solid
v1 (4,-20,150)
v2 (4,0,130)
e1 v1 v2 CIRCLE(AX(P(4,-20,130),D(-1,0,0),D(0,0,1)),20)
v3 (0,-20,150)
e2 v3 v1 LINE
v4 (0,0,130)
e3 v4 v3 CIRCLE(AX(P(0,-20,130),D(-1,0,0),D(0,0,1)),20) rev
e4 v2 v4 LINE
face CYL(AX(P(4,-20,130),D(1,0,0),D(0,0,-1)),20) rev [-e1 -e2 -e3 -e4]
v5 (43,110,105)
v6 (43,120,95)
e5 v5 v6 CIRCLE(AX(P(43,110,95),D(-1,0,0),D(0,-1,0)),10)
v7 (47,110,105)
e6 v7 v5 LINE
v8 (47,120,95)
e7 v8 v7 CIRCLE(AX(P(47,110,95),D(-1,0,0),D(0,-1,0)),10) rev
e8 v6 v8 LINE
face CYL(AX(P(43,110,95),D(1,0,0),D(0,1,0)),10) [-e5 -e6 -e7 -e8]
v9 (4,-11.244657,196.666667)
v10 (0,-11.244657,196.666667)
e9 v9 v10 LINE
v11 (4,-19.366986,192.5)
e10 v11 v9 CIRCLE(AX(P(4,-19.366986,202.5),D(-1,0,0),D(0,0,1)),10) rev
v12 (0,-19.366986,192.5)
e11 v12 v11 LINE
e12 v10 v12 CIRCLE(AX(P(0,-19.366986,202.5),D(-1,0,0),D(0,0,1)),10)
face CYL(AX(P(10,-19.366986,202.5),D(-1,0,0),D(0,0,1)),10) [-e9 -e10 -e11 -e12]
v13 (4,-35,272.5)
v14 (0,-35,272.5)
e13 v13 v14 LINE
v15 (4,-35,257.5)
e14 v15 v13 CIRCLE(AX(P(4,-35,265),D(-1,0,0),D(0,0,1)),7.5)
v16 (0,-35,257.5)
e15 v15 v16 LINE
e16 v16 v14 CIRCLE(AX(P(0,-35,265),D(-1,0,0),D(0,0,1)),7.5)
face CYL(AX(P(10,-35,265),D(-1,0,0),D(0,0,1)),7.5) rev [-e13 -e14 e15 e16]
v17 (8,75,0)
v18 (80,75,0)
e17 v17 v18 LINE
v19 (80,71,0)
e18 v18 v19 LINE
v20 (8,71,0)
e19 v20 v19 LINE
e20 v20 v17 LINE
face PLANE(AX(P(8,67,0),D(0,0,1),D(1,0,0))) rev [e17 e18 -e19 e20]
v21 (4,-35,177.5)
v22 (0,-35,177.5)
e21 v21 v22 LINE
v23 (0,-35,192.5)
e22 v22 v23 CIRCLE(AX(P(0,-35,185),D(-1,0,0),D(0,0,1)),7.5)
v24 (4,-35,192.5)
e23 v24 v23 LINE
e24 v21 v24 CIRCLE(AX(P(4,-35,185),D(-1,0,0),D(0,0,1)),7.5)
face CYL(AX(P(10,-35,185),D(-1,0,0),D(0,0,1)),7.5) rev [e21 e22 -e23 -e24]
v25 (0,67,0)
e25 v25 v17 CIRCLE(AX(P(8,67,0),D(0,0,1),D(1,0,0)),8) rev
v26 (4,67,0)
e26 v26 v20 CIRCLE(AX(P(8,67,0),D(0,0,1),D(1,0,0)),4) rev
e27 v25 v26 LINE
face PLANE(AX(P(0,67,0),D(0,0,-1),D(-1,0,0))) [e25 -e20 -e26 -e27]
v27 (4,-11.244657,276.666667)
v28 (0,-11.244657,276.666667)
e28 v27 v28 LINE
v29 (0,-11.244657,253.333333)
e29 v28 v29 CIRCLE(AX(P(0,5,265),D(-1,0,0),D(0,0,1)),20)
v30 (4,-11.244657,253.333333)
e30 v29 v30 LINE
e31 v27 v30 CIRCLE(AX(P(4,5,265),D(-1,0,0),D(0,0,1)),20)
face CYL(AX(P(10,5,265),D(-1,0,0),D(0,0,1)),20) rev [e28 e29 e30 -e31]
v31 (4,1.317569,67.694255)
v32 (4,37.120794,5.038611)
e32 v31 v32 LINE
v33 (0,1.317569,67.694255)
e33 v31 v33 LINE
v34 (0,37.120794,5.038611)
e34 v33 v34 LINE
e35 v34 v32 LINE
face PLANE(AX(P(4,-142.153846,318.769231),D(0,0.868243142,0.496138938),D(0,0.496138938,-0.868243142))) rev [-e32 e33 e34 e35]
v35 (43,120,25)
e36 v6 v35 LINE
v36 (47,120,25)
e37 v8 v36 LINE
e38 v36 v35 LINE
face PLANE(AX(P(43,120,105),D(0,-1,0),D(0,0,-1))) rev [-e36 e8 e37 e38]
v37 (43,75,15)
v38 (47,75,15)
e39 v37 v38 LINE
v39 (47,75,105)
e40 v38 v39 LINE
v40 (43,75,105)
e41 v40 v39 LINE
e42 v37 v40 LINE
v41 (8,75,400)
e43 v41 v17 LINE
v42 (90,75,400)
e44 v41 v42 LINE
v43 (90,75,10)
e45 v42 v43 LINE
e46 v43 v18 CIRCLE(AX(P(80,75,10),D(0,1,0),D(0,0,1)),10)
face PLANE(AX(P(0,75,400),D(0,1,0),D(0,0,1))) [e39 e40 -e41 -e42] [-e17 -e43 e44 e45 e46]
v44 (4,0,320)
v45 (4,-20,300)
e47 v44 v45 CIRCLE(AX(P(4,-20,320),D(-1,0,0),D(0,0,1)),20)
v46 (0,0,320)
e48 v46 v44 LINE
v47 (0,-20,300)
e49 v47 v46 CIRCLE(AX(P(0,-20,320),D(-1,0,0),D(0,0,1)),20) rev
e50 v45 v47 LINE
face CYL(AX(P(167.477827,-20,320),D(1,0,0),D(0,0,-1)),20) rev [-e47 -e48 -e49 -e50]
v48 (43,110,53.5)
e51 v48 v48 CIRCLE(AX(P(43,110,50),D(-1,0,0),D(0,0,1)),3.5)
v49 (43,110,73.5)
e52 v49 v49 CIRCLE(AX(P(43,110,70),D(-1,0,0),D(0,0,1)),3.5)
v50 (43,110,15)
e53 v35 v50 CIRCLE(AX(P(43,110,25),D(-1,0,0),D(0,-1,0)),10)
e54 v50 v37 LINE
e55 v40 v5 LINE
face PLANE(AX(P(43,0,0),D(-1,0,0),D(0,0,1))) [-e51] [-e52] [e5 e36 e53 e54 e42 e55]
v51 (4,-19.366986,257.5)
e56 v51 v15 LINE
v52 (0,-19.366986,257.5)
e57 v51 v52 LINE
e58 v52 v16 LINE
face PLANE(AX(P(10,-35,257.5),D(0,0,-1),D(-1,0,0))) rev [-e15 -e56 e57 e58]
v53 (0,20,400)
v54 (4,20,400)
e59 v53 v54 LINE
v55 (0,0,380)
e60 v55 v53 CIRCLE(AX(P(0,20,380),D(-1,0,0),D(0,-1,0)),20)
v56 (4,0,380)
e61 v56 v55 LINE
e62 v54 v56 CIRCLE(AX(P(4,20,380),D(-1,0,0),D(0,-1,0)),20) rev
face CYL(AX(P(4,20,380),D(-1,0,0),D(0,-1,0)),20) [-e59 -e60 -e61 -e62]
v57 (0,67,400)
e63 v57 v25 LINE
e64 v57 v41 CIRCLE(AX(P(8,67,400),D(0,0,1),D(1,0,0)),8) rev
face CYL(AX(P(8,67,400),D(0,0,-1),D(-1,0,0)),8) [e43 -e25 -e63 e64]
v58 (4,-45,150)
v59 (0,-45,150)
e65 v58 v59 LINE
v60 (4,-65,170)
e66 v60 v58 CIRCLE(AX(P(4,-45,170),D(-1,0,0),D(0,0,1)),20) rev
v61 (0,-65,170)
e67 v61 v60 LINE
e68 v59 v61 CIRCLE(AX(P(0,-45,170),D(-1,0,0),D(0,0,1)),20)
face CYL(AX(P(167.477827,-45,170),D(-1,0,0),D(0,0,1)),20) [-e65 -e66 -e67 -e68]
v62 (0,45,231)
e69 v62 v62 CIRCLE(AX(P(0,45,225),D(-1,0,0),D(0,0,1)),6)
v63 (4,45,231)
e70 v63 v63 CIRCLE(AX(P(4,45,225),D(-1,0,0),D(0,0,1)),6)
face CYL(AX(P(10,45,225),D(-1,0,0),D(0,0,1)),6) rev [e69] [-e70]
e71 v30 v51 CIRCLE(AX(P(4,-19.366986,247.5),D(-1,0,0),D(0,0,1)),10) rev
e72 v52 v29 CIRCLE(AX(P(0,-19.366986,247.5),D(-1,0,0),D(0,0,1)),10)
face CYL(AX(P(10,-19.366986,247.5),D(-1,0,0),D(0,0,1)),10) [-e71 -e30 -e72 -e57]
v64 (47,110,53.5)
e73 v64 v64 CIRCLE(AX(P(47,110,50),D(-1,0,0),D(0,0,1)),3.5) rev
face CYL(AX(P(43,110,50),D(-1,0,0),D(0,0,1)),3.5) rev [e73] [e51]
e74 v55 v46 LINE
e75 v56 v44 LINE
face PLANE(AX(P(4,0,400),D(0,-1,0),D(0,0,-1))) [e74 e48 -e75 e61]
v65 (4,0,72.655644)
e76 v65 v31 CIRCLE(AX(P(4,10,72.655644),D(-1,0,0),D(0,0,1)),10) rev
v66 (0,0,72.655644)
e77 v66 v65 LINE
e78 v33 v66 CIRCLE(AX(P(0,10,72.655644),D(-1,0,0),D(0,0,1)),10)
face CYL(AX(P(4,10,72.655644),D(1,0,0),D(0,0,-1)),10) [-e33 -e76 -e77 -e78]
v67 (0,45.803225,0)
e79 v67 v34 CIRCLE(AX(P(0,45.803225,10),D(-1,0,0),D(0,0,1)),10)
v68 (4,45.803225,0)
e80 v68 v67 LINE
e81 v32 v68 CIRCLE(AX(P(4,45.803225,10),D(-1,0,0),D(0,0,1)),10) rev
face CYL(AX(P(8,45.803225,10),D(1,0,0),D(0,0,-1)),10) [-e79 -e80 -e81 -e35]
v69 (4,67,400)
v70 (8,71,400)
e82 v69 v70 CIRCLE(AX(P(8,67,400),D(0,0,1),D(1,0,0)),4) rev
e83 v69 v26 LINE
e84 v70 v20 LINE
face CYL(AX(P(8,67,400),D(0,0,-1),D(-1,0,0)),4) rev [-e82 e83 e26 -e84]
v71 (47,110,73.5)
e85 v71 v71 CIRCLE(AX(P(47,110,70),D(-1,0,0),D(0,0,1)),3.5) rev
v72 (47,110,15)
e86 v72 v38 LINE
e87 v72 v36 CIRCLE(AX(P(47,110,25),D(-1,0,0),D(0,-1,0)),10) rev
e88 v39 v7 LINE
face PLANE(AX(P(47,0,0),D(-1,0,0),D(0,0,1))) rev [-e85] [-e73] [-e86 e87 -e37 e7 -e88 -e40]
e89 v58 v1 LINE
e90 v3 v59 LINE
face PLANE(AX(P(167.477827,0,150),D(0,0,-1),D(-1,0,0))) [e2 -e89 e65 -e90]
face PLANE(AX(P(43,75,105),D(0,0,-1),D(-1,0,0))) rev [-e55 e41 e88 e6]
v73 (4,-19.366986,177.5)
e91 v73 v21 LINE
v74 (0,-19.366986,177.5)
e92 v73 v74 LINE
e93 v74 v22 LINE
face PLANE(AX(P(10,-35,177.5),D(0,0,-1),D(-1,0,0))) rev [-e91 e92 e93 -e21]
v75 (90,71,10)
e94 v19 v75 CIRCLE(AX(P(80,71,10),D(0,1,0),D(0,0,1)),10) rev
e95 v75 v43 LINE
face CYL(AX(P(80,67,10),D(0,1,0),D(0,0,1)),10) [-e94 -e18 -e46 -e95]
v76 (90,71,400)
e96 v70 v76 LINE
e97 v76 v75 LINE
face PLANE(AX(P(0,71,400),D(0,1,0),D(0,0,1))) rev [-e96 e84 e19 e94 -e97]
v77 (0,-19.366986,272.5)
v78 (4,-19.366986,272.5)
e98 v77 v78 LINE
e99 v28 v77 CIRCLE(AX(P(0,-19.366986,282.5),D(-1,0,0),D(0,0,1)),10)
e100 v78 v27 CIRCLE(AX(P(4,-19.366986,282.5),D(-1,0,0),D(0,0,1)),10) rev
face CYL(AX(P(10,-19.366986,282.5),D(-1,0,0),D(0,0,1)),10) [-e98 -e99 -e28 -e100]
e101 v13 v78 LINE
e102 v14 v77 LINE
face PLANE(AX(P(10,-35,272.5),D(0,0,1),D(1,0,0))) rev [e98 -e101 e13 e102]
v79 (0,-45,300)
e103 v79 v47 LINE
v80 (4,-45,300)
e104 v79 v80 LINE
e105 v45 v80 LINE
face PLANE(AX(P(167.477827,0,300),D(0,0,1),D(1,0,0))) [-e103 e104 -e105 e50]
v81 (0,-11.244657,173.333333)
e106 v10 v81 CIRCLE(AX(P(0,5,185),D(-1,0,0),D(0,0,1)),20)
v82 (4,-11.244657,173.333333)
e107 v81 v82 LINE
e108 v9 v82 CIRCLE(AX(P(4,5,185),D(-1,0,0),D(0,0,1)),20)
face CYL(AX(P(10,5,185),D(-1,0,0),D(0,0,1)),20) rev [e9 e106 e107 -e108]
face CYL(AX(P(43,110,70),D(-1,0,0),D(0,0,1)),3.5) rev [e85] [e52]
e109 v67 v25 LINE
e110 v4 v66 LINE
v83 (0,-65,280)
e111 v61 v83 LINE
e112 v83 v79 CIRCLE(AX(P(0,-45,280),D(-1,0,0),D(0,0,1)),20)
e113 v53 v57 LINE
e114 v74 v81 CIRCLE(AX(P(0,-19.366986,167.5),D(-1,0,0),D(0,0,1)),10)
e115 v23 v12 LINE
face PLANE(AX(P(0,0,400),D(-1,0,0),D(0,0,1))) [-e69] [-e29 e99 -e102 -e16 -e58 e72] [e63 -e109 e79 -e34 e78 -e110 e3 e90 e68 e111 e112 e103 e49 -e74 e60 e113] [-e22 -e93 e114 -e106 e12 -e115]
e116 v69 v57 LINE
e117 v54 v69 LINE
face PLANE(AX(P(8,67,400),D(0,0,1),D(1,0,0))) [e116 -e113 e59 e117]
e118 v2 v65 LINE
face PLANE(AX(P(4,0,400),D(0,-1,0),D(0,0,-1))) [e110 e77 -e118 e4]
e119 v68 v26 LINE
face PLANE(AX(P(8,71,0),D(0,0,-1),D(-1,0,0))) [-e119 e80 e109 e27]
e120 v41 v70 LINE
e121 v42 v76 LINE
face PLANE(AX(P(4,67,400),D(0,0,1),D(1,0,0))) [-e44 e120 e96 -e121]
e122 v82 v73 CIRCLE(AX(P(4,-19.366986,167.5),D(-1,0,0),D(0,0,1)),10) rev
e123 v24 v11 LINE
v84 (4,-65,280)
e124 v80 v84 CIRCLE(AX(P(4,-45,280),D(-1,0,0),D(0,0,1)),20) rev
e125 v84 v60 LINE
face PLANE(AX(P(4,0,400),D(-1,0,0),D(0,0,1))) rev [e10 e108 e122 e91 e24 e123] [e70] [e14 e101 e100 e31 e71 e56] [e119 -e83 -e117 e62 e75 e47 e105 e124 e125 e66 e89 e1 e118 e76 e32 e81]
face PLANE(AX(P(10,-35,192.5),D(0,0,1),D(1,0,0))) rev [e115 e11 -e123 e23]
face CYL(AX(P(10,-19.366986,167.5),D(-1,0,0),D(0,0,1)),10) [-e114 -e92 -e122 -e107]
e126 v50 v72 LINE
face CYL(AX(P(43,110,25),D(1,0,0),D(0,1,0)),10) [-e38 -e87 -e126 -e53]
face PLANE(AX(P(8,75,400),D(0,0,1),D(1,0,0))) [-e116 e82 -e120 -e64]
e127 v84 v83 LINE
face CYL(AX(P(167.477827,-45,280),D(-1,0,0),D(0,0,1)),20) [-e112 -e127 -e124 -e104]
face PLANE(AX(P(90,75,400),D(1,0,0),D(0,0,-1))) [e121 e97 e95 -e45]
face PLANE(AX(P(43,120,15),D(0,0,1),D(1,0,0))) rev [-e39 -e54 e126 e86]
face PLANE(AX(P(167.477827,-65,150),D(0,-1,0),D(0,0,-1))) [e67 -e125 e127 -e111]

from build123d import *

# Parameters (mm, degrees)
SM_BASE_FLANGE_1_DEPTH = 400
CUT_EXTRUDE_1_DEPTH    = 10
FILLET_1_R             = 10
SKETCH_7_W             = 150
SKETCH_7_H             = 65
EXTRUDE_1_DEPTH        = 4
SKETCH_8_R             = 6
CUT_EXTRUDE_2_DEPTH    = 10
FILLET_2_R             = 10
FILLET_3_R             = 20
SKETCH_10_W            = 90
SKETCH_10_H            = 45
EXTRUDE_2_DEPTH        = 2
HOLE_WIZARD_7_0_7_1_D  = 7
FILLET_4_R             = 10
FILLET_5_R             = 20


# Sheet-metal steps are written as plain solids
with BuildPart() as part:
    # Sketch 1 → 基体-法兰1 (new body)
    with BuildSketch(Plane.XY):
        with BuildLine():
            Line((0, 0), (0, 67))
            ThreePointArc((0, 67), (2.343145751, 72.656854249), (8, 75))
            Line((8, 75), (90, 75))
            Line((90, 75), (90, 71))
            Line((90, 71), (8, 71))
            ThreePointArc((8, 71), (5.171572875, 69.828427125), (4, 67))
            Line((4, 67), (4, 0))
            Line((4, 0), (0, 0))
        make_face()
    extrude(amount=SM_BASE_FLANGE_1_DEPTH)

    # 草图6 → 切除-拉伸1 (cut)
    with BuildSketch(Plane.ZY):
        Polygon((0, 0), (0, 40), (70, 0), align=None)
    extrude(amount=-CUT_EXTRUDE_1_DEPTH, mode=Mode.SUBTRACT)

    # 圆角1
    fillet_1_edges = [part.edges().sort_by_distance(p)[0] for p in [
        (2, 40, 0),
        (2, 0, 70),
        (90, 73, 0),
    ]]
    fillet(fillet_1_edges, radius=FILLET_1_R)

    # 草图7 → 凸台-拉伸1 (add)
    with BuildSketch(Plane.ZY):
        with Locations((225, -32.5)):
            Rectangle(SKETCH_7_W, SKETCH_7_H)
    extrude(amount=-EXTRUDE_1_DEPTH)

    # 草图8 → 切除-拉伸2 (cut)
    with BuildSketch(Plane.ZY):
        with Locations((225, 45)):
            Circle(SKETCH_8_R)
        with BuildLine():
            Line((192.5, -35), (192.5, -13.540496218))
            ThreePointArc((192.5, -13.540496218), (185, 25), (177.5, -13.540496218))
            Line((177.5, -13.540496218), (177.5, -35))
            ThreePointArc((177.5, -35), (185, -42.5), (192.5, -35))
        make_face()
        with BuildLine():
            Line((257.5, -35), (257.5, -13.540496218))
            ThreePointArc((257.5, -13.540496218), (265, 25), (272.5, -13.540496218))
            Line((272.5, -13.540496218), (272.5, -35))
            ThreePointArc((272.5, -35), (265, -42.5), (257.5, -35))
        make_face()
    extrude(amount=-CUT_EXTRUDE_2_DEPTH, mode=Mode.SUBTRACT)

    # 圆角2
    fillet_2_edges = [part.edges().sort_by_distance(p)[0] for p in [
        (2, -13.540496218, 177.5),
        (2, -13.540496218, 192.5),
        (2, -13.540496218, 257.5),
        (2, -13.540496218, 272.5),
    ]]
    fillet(fillet_2_edges, radius=FILLET_2_R)

    # 圆角3
    fillet_3_edges = [part.edges().sort_by_distance(p)[0] for p in [
        (2, -65, 150),
        (2, 0, 150),
        (2, 0, 300),
        (2, -65, 300),
    ]]
    fillet(fillet_3_edges, radius=FILLET_3_R)

    # 草图10 → 凸台-拉伸2 (add, symmetric)
    with BuildSketch(Plane.ZY.offset(-45)):
        with Locations((60, 97.5)):
            Rectangle(SKETCH_10_W, SKETCH_10_H)
    extrude(amount=EXTRUDE_2_DEPTH, both=True)

    # Ø7.0 (7) 直径孔1 (through all)
    with Locations(Plane.ZY.offset(-43)):
        with Locations((50, 110), (70, 110)):
            Hole(HOLE_WIZARD_7_0_7_1_D / 2)

    # 圆角4
    fillet_4_edges = [part.edges().sort_by_distance(p)[0] for p in [
        (45, 120, 105),
        (45, 120, 15),
    ]]
    fillet(fillet_4_edges, radius=FILLET_4_R)

    # 圆角5
    fillet_5_edges = [part.edges().sort_by_distance(p)[0] for p in [
        (2, 0, 400),
    ]]
    fillet(fillet_5_edges, radius=FILLET_5_R)


solid = part.part
